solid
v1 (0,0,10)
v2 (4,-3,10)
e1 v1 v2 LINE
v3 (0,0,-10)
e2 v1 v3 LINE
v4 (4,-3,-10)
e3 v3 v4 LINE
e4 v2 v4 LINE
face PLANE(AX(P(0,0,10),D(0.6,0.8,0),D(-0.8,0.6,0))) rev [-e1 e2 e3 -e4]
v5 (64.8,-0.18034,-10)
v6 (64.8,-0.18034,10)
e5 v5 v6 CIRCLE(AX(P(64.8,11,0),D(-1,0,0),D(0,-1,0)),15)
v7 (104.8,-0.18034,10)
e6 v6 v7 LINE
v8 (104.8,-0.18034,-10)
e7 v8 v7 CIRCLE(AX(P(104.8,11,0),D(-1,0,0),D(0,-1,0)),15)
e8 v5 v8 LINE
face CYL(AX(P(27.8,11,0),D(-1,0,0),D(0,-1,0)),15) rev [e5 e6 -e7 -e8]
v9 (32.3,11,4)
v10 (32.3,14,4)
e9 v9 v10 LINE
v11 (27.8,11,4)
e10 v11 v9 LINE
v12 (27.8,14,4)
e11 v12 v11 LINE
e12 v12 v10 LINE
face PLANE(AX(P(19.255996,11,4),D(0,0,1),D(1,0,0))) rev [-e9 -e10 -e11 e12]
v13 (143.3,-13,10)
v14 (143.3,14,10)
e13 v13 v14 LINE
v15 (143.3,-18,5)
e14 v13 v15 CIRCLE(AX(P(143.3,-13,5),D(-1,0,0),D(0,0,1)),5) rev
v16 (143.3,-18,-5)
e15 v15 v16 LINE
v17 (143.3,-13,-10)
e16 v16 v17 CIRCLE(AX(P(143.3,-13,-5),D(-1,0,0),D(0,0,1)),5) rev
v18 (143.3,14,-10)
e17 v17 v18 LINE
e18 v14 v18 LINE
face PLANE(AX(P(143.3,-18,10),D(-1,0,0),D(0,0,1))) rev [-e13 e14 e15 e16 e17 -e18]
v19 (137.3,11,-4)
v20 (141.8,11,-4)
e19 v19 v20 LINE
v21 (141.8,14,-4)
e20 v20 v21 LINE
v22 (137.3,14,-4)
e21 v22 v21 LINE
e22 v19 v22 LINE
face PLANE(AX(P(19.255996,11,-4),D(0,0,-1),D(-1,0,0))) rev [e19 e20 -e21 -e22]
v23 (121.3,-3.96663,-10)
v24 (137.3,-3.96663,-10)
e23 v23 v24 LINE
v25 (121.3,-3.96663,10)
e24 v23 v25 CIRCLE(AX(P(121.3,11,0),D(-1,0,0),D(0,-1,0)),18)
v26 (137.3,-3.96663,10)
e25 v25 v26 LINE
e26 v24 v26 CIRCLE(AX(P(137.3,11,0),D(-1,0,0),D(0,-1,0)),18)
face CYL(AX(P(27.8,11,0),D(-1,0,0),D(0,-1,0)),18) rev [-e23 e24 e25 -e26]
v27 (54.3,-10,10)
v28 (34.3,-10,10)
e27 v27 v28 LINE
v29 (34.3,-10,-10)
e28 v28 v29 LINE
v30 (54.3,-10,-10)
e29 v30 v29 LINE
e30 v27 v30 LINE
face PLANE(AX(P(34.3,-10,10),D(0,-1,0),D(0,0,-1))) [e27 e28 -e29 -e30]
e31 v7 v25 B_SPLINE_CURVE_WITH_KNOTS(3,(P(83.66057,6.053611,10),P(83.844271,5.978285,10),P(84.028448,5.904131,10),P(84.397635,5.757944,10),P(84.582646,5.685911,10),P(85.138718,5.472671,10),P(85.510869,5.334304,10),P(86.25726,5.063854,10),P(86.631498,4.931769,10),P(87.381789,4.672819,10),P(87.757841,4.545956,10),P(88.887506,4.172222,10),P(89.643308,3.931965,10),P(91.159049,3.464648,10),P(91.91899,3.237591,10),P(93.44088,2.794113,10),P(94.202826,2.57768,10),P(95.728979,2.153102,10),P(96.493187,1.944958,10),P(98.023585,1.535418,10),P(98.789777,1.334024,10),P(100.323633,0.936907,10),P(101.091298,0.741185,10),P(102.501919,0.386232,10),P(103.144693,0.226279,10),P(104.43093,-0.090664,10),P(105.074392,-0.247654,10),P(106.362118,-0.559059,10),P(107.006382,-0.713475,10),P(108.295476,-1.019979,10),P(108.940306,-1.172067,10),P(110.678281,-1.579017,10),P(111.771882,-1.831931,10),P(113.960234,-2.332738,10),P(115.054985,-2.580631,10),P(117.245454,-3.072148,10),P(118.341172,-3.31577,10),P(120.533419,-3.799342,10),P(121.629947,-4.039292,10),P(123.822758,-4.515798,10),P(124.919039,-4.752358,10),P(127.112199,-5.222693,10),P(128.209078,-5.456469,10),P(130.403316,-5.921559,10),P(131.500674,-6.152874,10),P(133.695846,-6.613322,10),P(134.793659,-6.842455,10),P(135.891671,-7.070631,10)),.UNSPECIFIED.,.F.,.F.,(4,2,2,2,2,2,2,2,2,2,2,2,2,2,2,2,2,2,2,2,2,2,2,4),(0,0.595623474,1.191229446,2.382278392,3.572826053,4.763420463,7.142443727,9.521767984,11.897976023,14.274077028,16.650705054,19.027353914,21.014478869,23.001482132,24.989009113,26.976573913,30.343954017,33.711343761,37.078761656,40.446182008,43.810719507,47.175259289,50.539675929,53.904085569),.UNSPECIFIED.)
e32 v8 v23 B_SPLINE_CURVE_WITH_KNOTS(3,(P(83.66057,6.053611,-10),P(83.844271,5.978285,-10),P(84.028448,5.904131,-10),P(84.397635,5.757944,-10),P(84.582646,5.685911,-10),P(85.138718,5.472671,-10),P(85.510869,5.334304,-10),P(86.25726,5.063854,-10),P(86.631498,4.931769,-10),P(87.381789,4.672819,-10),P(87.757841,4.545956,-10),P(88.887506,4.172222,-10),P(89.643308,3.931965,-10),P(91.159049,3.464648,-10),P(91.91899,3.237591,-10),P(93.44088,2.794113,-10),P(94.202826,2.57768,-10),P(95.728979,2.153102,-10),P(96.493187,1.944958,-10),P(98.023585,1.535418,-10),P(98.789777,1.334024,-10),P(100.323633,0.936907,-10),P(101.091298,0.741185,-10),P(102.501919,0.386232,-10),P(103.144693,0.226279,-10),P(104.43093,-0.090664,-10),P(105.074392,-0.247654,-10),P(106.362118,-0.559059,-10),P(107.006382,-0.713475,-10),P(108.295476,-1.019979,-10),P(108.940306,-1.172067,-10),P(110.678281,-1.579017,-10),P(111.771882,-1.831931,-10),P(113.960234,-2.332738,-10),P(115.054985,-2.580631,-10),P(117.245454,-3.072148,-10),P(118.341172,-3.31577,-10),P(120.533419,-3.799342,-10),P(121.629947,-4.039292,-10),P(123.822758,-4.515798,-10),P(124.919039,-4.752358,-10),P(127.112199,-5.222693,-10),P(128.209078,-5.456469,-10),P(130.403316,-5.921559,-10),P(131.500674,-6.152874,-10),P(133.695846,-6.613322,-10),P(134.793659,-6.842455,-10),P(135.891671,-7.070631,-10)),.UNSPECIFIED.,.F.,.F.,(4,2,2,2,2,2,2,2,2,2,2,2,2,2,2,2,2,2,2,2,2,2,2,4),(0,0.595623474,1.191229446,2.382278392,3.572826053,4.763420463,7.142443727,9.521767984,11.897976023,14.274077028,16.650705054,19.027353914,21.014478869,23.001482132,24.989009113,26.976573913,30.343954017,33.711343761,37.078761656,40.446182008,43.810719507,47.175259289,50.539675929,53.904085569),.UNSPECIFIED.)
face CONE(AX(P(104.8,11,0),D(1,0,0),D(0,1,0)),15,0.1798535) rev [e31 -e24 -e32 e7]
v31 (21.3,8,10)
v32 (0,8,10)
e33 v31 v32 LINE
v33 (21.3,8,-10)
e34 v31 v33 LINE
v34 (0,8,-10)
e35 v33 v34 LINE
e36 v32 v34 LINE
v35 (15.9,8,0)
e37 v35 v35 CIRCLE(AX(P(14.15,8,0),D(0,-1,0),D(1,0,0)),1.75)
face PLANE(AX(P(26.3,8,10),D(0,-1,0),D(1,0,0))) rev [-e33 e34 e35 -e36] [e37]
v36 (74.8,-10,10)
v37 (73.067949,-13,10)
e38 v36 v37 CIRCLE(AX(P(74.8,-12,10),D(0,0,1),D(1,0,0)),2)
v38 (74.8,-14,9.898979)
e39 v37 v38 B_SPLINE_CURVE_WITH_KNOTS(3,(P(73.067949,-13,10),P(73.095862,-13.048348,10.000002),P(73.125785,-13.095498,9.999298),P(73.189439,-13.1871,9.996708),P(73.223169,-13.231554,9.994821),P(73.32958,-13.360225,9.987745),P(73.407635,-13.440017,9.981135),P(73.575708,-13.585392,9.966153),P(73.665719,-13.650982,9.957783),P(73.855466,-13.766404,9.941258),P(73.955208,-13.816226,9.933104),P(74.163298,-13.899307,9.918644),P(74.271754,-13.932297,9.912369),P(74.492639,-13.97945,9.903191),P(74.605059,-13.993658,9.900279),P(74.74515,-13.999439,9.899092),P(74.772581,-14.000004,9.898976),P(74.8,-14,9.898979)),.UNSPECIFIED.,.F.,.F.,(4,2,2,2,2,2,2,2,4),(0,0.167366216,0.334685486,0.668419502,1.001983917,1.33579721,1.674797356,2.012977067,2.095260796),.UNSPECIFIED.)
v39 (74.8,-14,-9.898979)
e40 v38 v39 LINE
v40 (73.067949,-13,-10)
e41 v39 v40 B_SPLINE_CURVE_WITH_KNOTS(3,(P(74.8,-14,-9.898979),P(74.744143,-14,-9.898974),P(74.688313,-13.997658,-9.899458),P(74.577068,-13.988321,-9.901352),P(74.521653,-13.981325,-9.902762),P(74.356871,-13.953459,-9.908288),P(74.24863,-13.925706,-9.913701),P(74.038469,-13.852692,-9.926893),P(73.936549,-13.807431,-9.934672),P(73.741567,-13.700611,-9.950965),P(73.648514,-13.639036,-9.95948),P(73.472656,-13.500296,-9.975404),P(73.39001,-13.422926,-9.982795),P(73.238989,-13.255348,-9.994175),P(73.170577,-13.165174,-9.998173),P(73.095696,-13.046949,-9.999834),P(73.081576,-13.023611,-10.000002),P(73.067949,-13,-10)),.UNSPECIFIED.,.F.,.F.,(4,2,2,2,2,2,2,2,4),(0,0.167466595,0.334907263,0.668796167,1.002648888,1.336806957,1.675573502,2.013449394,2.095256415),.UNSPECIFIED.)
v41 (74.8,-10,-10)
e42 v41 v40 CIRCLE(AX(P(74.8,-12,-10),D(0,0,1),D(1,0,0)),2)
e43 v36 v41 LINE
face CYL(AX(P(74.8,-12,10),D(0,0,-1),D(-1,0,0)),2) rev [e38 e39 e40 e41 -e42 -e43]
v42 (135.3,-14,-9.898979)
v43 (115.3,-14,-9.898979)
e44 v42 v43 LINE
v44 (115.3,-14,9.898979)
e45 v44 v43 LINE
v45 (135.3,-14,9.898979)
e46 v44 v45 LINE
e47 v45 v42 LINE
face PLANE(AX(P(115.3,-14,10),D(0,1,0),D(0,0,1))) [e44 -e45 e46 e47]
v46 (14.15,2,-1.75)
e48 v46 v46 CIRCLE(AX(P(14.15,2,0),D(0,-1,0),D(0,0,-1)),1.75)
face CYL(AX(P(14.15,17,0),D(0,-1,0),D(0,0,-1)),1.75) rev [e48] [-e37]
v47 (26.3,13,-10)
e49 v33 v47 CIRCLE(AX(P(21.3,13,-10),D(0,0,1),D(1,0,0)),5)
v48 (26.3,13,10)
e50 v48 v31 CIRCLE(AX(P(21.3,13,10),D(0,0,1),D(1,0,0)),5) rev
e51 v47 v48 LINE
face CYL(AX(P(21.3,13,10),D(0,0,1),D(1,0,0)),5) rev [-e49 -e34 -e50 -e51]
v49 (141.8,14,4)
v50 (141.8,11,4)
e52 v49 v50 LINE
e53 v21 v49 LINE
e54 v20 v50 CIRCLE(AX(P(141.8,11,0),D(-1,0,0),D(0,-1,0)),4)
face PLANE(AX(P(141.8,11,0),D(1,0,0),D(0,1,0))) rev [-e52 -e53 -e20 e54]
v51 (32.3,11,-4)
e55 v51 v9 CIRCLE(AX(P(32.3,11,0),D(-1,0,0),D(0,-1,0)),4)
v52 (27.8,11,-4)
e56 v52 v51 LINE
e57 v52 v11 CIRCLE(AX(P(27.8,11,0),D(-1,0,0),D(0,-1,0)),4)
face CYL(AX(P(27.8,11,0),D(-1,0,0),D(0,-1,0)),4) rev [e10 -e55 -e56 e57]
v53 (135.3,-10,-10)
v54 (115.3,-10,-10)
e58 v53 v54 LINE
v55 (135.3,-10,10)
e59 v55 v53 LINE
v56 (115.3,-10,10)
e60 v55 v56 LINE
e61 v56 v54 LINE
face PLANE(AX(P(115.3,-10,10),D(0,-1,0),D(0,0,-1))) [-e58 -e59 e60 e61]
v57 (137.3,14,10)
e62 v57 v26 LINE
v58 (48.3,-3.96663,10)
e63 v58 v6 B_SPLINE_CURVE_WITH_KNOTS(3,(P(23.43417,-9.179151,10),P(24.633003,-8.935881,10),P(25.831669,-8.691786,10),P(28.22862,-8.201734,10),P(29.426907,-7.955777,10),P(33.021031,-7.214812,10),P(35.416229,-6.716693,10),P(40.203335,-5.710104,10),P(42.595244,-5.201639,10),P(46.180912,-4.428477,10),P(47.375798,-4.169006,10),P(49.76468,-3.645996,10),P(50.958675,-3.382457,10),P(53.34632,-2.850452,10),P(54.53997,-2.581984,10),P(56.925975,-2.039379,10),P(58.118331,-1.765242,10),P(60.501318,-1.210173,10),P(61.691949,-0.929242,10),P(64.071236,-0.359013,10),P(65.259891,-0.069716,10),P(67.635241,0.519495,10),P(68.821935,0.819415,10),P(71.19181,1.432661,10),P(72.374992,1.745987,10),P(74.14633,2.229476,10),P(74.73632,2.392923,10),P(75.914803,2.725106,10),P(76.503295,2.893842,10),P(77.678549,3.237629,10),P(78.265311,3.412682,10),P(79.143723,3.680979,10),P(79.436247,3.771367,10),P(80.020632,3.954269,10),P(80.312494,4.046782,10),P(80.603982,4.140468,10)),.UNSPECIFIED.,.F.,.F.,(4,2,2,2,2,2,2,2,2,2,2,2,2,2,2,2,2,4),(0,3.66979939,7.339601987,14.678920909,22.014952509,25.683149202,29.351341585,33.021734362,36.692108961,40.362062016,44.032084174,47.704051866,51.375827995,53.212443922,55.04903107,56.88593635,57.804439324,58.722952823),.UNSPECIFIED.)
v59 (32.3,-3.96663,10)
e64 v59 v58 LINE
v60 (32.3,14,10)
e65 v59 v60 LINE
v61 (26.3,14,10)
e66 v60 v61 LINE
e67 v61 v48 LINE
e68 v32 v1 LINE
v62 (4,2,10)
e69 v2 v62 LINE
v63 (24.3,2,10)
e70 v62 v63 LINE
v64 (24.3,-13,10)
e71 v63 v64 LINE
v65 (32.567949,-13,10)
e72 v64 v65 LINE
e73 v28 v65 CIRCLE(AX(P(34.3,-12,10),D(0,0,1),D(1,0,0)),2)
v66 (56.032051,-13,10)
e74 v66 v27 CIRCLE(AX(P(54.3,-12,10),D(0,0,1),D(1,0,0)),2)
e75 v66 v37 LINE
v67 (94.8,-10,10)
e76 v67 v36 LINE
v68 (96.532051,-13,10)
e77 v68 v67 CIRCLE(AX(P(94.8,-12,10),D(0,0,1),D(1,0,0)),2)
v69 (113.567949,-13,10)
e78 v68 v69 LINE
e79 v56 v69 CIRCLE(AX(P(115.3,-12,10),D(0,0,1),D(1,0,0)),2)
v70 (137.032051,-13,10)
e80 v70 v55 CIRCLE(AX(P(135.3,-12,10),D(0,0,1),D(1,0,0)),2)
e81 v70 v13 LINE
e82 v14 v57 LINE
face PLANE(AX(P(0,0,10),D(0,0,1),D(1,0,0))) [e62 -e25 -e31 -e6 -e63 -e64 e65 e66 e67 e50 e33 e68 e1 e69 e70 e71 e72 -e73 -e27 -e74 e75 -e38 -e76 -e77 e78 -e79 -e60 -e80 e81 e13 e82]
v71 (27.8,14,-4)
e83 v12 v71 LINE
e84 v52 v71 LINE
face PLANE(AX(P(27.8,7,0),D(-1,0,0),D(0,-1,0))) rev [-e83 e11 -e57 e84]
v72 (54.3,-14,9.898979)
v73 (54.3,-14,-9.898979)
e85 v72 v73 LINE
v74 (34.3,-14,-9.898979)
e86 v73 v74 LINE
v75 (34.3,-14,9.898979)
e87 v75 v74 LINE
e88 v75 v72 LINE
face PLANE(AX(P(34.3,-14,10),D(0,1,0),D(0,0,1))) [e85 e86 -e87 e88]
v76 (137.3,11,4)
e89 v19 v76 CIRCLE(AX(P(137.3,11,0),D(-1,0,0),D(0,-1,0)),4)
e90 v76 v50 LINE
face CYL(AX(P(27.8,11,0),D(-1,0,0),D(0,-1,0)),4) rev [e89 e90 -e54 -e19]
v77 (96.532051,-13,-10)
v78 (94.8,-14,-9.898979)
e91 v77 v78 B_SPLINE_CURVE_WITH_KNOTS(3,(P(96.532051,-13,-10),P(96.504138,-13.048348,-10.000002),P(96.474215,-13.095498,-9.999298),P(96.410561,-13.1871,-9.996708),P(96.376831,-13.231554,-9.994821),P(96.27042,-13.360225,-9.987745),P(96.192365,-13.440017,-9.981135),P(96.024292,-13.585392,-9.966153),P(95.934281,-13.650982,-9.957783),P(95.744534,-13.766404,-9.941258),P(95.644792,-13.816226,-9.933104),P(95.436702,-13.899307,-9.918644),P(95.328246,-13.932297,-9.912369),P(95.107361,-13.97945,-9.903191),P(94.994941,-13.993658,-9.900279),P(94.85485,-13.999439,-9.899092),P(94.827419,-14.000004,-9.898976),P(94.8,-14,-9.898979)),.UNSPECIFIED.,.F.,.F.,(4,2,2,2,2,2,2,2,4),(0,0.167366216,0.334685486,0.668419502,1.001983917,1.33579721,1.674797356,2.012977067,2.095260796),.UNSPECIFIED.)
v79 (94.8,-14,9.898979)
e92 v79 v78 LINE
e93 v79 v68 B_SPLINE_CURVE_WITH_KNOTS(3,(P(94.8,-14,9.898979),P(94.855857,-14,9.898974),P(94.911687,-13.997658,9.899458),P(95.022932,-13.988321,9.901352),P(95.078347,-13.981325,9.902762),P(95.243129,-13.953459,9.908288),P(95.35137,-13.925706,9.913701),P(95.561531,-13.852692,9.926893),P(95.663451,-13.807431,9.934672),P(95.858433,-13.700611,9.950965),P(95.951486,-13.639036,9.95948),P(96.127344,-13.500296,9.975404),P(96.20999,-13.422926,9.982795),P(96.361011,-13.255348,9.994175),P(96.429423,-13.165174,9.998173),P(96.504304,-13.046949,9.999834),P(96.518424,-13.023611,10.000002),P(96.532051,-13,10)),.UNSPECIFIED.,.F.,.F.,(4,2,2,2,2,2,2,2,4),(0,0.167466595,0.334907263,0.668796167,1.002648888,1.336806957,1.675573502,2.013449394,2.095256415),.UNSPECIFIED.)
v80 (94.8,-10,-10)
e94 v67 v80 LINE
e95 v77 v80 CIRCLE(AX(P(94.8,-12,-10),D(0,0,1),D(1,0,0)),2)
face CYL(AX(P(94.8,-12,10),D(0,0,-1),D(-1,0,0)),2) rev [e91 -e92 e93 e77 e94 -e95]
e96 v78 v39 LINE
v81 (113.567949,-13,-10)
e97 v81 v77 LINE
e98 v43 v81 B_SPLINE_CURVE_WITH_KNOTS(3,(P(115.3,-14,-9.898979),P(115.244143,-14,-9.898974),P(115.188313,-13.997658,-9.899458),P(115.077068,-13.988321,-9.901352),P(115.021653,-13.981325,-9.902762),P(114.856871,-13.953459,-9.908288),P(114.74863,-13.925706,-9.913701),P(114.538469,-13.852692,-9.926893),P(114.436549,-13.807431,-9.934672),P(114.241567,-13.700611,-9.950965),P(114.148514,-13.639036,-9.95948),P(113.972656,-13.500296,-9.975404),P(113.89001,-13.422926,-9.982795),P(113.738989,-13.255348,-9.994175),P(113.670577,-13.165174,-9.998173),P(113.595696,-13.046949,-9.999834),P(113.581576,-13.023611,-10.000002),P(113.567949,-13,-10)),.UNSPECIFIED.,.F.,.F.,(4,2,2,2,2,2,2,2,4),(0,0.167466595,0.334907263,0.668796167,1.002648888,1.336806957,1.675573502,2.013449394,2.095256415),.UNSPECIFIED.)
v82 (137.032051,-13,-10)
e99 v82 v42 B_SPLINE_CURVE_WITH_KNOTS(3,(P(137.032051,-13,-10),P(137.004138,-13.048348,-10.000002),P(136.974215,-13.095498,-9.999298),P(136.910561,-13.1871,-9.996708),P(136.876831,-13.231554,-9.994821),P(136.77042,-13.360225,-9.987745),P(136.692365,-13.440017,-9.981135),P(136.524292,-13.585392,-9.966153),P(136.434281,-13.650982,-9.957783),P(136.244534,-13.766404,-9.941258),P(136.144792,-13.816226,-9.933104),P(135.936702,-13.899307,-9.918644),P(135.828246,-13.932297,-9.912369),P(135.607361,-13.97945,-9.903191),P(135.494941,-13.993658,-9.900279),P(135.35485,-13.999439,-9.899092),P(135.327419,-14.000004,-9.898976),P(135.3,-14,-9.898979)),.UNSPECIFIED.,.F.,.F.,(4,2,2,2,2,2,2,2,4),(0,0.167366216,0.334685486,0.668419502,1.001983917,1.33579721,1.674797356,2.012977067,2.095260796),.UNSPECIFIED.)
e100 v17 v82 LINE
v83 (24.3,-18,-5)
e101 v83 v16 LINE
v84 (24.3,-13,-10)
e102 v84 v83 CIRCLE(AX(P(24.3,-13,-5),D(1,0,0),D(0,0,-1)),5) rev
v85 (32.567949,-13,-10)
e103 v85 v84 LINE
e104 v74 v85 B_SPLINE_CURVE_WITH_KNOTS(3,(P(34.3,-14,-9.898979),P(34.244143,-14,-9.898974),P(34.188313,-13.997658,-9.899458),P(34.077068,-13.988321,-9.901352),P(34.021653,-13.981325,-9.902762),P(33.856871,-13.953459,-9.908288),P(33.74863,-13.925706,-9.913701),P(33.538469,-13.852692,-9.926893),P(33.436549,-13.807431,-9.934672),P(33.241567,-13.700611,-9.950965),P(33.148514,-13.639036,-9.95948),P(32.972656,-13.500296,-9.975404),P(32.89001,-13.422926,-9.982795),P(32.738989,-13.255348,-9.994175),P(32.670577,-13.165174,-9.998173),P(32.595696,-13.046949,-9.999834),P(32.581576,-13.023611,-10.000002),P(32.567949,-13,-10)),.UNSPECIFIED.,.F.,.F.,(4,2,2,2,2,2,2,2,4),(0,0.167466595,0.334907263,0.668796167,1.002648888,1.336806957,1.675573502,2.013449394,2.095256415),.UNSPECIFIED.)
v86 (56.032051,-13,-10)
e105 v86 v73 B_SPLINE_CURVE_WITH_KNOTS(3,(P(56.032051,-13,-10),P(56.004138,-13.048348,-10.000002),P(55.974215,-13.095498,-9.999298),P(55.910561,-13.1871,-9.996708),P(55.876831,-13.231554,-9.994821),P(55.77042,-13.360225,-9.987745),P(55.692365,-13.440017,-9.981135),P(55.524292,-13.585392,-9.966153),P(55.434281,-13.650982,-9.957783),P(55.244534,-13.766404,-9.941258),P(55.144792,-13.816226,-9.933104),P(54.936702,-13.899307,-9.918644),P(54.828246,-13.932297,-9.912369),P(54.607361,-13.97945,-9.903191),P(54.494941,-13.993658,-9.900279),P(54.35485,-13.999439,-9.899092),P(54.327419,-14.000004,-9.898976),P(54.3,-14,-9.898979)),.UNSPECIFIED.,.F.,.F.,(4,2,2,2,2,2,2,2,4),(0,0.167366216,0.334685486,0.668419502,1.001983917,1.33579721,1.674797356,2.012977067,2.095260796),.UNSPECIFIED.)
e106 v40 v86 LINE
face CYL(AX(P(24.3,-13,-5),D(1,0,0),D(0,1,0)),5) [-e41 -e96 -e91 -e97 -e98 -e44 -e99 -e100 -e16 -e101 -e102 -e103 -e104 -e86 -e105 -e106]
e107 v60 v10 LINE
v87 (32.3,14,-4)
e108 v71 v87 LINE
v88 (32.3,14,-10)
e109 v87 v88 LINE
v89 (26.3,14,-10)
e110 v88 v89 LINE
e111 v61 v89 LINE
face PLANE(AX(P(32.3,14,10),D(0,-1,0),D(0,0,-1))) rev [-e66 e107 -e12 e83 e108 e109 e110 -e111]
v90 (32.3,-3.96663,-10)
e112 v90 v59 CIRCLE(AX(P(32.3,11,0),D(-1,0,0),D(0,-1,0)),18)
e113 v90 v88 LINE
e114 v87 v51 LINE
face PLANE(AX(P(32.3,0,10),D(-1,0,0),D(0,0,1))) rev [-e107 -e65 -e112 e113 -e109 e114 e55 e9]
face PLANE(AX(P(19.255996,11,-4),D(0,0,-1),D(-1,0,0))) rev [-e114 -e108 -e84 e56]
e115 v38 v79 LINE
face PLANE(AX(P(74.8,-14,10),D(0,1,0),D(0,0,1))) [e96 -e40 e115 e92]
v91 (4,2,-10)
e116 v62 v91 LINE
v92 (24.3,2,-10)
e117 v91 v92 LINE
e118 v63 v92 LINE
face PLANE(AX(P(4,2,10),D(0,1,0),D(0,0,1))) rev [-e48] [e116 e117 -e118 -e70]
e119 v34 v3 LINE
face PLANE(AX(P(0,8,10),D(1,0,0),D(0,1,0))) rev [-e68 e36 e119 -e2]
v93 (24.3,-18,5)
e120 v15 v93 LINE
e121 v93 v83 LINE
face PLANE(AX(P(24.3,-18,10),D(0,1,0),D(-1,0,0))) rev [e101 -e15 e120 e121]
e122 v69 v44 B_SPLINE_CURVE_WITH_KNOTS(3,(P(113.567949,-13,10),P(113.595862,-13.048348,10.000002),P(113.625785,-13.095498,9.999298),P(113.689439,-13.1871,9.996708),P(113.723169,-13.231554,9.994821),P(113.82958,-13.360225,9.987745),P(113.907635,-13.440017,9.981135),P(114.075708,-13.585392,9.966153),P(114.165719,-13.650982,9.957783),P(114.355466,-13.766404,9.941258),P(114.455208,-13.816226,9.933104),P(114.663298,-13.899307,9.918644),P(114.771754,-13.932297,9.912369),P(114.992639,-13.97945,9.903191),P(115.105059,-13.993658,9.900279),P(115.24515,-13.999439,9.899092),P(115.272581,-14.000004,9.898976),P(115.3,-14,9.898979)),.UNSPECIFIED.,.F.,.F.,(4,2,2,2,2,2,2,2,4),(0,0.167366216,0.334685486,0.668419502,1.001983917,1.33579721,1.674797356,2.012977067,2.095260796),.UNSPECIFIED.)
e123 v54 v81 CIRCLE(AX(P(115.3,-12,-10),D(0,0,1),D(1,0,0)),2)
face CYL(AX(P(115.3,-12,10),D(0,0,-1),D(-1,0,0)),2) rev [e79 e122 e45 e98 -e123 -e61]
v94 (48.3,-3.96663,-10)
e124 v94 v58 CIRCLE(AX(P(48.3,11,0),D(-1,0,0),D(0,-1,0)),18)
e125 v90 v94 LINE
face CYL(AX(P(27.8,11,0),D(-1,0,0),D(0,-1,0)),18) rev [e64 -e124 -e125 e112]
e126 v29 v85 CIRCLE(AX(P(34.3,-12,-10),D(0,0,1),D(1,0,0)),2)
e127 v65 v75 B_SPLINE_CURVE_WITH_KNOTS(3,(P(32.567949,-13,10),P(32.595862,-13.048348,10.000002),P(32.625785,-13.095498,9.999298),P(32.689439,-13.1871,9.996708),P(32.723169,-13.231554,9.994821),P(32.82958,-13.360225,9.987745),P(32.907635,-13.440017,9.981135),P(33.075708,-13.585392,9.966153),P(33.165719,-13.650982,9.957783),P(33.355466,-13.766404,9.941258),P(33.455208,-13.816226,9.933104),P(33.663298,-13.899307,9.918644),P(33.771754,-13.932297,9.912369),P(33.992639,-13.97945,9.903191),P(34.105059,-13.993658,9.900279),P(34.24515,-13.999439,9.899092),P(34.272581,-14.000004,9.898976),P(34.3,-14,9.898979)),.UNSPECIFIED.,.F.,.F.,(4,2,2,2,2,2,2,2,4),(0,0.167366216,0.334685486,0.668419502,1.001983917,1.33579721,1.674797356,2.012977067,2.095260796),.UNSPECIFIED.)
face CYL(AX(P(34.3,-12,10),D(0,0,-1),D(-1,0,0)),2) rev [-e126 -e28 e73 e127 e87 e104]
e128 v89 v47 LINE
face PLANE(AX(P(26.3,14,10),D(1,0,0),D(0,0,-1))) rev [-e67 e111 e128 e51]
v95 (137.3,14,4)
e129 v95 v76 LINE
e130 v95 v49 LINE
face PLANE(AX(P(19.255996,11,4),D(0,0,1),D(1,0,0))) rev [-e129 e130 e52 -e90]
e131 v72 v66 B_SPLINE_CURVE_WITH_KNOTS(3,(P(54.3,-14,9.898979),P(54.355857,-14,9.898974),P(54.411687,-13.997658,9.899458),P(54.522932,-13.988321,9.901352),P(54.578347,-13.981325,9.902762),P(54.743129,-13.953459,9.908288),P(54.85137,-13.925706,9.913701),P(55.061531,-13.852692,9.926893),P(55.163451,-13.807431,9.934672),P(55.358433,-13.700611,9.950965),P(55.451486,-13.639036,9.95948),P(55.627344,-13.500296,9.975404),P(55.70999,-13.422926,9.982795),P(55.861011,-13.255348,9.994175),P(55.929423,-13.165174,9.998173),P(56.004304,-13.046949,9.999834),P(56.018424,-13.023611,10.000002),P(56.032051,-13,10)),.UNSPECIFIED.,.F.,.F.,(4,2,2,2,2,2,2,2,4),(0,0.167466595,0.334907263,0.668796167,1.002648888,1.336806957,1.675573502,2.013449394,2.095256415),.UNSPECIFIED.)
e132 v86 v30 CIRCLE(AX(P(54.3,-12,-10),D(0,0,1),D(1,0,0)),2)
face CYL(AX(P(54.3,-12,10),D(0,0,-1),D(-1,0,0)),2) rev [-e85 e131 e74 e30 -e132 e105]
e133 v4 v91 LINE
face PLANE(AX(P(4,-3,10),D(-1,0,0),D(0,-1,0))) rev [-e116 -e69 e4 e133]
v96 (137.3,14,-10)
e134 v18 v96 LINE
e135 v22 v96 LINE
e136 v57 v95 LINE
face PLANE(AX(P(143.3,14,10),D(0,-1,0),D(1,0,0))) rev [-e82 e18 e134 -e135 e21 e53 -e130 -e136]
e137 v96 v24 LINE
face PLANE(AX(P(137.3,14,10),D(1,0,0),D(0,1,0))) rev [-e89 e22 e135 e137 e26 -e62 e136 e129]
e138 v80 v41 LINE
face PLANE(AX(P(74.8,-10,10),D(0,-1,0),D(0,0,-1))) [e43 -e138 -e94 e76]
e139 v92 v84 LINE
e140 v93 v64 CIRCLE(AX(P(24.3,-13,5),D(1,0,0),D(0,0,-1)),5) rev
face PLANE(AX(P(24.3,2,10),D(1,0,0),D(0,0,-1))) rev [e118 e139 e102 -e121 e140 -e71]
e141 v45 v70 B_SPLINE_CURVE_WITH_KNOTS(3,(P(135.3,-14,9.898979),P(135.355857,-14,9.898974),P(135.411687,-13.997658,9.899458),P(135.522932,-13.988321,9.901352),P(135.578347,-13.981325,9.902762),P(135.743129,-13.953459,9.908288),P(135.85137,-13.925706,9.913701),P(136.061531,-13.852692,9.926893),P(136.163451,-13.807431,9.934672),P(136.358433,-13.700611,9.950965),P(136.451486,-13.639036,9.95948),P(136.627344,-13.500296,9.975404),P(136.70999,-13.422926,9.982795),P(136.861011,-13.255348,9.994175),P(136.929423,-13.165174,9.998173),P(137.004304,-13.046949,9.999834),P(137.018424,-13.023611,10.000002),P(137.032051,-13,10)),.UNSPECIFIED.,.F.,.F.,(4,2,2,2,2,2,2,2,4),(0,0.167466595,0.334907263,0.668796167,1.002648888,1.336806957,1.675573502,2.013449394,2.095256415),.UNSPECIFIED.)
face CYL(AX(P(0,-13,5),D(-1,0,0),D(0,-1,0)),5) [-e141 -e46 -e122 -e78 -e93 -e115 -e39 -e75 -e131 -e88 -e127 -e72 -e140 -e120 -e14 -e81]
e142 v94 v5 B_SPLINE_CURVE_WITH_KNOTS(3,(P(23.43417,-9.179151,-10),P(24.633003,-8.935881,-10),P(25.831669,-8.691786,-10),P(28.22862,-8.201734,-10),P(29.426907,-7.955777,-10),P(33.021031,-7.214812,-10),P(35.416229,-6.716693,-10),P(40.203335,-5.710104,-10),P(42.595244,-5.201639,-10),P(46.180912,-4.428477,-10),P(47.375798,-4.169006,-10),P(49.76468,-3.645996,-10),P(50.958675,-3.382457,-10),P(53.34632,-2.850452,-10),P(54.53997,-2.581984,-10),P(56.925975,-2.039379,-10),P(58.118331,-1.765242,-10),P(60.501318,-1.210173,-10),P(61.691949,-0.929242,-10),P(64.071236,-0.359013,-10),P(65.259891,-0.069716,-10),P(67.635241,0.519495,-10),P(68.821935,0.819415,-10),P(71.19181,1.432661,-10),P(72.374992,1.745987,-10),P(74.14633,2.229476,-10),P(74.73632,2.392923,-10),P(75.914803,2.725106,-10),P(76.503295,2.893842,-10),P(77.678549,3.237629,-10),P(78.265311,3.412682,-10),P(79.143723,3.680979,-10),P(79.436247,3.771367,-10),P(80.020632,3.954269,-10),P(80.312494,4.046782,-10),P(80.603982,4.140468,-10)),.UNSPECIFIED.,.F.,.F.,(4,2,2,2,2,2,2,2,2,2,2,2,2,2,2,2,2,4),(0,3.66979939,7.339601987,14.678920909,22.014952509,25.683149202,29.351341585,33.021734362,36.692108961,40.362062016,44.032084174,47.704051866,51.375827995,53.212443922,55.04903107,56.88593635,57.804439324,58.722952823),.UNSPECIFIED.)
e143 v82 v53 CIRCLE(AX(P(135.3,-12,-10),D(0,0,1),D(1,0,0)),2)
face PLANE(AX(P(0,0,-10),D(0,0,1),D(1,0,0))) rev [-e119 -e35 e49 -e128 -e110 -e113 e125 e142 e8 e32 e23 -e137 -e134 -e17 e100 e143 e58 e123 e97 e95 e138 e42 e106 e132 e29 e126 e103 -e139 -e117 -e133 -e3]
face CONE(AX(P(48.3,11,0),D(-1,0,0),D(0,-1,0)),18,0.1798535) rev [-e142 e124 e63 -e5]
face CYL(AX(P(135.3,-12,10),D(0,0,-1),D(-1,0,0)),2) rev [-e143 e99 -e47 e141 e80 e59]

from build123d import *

# Parameters (mm, degrees)
RESSALTO_EXTRUS_O1_DEPTH          = 10
CORTE_EXTRUS_O1_REACH             = 114.894
ESBO_O4_W                         = 8
ESBO_O4_H                         = 3
CORTE_EXTRUS_O1_DIRECTION_2_REACH = 114.894
FILETE1_R                         = 5
ESBO_O7_R                         = 1.75
CORTE_EXTRUS_O3_DEPTH             = 15
FILETE2_R                         = 5


with BuildPart() as part:
    # Esboço1 → Ressalto-extrusão1 (new, symmetric)
    with BuildSketch(Plane.XY):
        Polygon((0, 0), (4, -3), (4, 2), (24.3, 2), (24.3, -18), (143.3, -18), (143.3, 14), (137.3, 14), (137.3, 0), (32.3, 0), (32.3, 14), (26.3, 14), (26.3, 8), (0, 8), align=None)
        with BuildLine():
            Line((34.3, -10), (54.3, -10))
            ThreePointArc((54.3, -10), (56.3, -12), (54.3, -14))
            Line((54.3, -14), (34.3, -14))
            ThreePointArc((34.3, -14), (32.3, -12), (34.3, -10))
        make_face(mode=Mode.SUBTRACT)
        with BuildLine():
            Line((74.8, -10), (94.8, -10))
            ThreePointArc((94.8, -10), (96.8, -12), (94.8, -14))
            Line((94.8, -14), (74.8, -14))
            ThreePointArc((74.8, -14), (72.8, -12), (74.8, -10))
        make_face(mode=Mode.SUBTRACT)
        with BuildLine():
            Line((115.3, -10), (135.3, -10))
            ThreePointArc((135.3, -10), (137.3, -12), (135.3, -14))
            Line((135.3, -14), (115.3, -14))
            ThreePointArc((115.3, -14), (113.3, -12), (115.3, -10))
        make_face(mode=Mode.SUBTRACT)
    extrude(amount=RESSALTO_EXTRUS_O1_DEPTH, both=True)

    # Esboço2 → Corte-Revolução1 (revolve, cut)
    with BuildSketch(Plane.XY):
        Polygon((27.8, 11), (141.8, 11), (141.8, 7), (137.3, 7), (137.3, -7), (121.3, -7), (104.8, -4), (64.8, -4), (48.3, -7), (32.3, -7), (32.3, 7), (27.8, 7), align=None)
    revolve(axis=Axis((27.8, 11, 0), (1, 0, 0)), mode=Mode.SUBTRACT)

    # Corte-extrusão1: up to this face of the body (flat: up to its plane)
    corte_extrus_o1_end = Plane(part.part.faces().sort_by_distance((27.8, 10.735267855, 0))[0])
    # Esboço4 → Corte-extrusão1 (cut, up to the picked face)
    with BuildSketch(Plane(origin=(32.3, 0, 0), x_dir=(0, 0, -1), z_dir=(1, 0, 0)), mode=Mode.PRIVATE) as corte_extrus_o1_sk1:
        with Locations((0, 12.5)):
            Rectangle(ESBO_O4_W, ESBO_O4_H)
    corte_extrus_o1_tool1 = split(extrude(corte_extrus_o1_sk1.sketch, amount=-CORTE_EXTRUS_O1_REACH, mode=Mode.PRIVATE), bisect_by=corte_extrus_o1_end, keep=Keep.BOTH, mode=Mode.PRIVATE)
    add(corte_extrus_o1_tool1.solids().sort_by(Axis((32.3, 12.5, 0), (-1, 0, 0)))[0], mode=Mode.SUBTRACT)

    # Corte-extrusão1 direction 2: up to this face of the body (flat: up to its plane)
    corte_extrus_o1_direction_2_end = Plane(part.part.faces().sort_by_distance((141.8, 10.735267855, 0))[0])
    # Esboço4 → Corte-extrusão1 direction 2 (cut, up to the picked face)
    with BuildSketch(Plane(origin=(32.3, 0, 0), x_dir=(0, 0, -1), z_dir=(1, 0, 0)), mode=Mode.PRIVATE) as corte_extrus_o1_direction_2_sk1:
        with Locations((0, 12.5)):
            Rectangle(ESBO_O4_W, ESBO_O4_H)
    corte_extrus_o1_direction_2_tool1 = split(extrude(corte_extrus_o1_direction_2_sk1.sketch, amount=CORTE_EXTRUS_O1_DIRECTION_2_REACH, mode=Mode.PRIVATE), bisect_by=corte_extrus_o1_direction_2_end, keep=Keep.BOTH, mode=Mode.PRIVATE)
    add(corte_extrus_o1_direction_2_tool1.solids().sort_by(Axis((32.3, 12.5, 0), (1, 0, 0)))[0], mode=Mode.SUBTRACT)

    # Filete1
    # the kernel refuses this fillet: 5 mm, written as the material it takes off along each edge
    with BuildSketch(Plane(origin=(11.8, -18, -10), x_dir=(0, 0, 1), z_dir=(1, 0, 0))) as filete1_piece_1:
        with BuildLine():
            CenterArc((FILETE1_R, -FILETE1_R), FILETE1_R, 90, 90)
            Line((0, -FILETE1_R), (0, 0))
            Line((0, 0), (FILETE1_R, 0))
        make_face()
    extrude(amount=144, mode=Mode.SUBTRACT)
    with BuildSketch(Plane(origin=(11.8, -18, 10), x_dir=(0, 0, -1), z_dir=(1, 0, 0))) as filete1_piece_2:
        with BuildLine():
            CenterArc((FILETE1_R, FILETE1_R), FILETE1_R, 180, 90)
            Line((0, FILETE1_R), (0, 0))
            Line((0, 0), (FILETE1_R, 0))
        make_face()
    extrude(amount=144, mode=Mode.SUBTRACT)

    # Esboço7 → Corte-extrusão3 (cut)
    with BuildSketch(Plane.XZ.offset(-2)):
        with Locations(Location((14.15, 0, 0), (0, 0, 270))):
            Circle(ESBO_O7_R)
    extrude(amount=-CORTE_EXTRUS_O3_DEPTH, mode=Mode.SUBTRACT)

    # Filete2
    filete2_edges = [part.edges().sort_by_distance(p)[0] for p in [
        (26.3, 8, 0),
    ]]
    fillet(filete2_edges, radius=FILETE2_R)


solid = part.part
